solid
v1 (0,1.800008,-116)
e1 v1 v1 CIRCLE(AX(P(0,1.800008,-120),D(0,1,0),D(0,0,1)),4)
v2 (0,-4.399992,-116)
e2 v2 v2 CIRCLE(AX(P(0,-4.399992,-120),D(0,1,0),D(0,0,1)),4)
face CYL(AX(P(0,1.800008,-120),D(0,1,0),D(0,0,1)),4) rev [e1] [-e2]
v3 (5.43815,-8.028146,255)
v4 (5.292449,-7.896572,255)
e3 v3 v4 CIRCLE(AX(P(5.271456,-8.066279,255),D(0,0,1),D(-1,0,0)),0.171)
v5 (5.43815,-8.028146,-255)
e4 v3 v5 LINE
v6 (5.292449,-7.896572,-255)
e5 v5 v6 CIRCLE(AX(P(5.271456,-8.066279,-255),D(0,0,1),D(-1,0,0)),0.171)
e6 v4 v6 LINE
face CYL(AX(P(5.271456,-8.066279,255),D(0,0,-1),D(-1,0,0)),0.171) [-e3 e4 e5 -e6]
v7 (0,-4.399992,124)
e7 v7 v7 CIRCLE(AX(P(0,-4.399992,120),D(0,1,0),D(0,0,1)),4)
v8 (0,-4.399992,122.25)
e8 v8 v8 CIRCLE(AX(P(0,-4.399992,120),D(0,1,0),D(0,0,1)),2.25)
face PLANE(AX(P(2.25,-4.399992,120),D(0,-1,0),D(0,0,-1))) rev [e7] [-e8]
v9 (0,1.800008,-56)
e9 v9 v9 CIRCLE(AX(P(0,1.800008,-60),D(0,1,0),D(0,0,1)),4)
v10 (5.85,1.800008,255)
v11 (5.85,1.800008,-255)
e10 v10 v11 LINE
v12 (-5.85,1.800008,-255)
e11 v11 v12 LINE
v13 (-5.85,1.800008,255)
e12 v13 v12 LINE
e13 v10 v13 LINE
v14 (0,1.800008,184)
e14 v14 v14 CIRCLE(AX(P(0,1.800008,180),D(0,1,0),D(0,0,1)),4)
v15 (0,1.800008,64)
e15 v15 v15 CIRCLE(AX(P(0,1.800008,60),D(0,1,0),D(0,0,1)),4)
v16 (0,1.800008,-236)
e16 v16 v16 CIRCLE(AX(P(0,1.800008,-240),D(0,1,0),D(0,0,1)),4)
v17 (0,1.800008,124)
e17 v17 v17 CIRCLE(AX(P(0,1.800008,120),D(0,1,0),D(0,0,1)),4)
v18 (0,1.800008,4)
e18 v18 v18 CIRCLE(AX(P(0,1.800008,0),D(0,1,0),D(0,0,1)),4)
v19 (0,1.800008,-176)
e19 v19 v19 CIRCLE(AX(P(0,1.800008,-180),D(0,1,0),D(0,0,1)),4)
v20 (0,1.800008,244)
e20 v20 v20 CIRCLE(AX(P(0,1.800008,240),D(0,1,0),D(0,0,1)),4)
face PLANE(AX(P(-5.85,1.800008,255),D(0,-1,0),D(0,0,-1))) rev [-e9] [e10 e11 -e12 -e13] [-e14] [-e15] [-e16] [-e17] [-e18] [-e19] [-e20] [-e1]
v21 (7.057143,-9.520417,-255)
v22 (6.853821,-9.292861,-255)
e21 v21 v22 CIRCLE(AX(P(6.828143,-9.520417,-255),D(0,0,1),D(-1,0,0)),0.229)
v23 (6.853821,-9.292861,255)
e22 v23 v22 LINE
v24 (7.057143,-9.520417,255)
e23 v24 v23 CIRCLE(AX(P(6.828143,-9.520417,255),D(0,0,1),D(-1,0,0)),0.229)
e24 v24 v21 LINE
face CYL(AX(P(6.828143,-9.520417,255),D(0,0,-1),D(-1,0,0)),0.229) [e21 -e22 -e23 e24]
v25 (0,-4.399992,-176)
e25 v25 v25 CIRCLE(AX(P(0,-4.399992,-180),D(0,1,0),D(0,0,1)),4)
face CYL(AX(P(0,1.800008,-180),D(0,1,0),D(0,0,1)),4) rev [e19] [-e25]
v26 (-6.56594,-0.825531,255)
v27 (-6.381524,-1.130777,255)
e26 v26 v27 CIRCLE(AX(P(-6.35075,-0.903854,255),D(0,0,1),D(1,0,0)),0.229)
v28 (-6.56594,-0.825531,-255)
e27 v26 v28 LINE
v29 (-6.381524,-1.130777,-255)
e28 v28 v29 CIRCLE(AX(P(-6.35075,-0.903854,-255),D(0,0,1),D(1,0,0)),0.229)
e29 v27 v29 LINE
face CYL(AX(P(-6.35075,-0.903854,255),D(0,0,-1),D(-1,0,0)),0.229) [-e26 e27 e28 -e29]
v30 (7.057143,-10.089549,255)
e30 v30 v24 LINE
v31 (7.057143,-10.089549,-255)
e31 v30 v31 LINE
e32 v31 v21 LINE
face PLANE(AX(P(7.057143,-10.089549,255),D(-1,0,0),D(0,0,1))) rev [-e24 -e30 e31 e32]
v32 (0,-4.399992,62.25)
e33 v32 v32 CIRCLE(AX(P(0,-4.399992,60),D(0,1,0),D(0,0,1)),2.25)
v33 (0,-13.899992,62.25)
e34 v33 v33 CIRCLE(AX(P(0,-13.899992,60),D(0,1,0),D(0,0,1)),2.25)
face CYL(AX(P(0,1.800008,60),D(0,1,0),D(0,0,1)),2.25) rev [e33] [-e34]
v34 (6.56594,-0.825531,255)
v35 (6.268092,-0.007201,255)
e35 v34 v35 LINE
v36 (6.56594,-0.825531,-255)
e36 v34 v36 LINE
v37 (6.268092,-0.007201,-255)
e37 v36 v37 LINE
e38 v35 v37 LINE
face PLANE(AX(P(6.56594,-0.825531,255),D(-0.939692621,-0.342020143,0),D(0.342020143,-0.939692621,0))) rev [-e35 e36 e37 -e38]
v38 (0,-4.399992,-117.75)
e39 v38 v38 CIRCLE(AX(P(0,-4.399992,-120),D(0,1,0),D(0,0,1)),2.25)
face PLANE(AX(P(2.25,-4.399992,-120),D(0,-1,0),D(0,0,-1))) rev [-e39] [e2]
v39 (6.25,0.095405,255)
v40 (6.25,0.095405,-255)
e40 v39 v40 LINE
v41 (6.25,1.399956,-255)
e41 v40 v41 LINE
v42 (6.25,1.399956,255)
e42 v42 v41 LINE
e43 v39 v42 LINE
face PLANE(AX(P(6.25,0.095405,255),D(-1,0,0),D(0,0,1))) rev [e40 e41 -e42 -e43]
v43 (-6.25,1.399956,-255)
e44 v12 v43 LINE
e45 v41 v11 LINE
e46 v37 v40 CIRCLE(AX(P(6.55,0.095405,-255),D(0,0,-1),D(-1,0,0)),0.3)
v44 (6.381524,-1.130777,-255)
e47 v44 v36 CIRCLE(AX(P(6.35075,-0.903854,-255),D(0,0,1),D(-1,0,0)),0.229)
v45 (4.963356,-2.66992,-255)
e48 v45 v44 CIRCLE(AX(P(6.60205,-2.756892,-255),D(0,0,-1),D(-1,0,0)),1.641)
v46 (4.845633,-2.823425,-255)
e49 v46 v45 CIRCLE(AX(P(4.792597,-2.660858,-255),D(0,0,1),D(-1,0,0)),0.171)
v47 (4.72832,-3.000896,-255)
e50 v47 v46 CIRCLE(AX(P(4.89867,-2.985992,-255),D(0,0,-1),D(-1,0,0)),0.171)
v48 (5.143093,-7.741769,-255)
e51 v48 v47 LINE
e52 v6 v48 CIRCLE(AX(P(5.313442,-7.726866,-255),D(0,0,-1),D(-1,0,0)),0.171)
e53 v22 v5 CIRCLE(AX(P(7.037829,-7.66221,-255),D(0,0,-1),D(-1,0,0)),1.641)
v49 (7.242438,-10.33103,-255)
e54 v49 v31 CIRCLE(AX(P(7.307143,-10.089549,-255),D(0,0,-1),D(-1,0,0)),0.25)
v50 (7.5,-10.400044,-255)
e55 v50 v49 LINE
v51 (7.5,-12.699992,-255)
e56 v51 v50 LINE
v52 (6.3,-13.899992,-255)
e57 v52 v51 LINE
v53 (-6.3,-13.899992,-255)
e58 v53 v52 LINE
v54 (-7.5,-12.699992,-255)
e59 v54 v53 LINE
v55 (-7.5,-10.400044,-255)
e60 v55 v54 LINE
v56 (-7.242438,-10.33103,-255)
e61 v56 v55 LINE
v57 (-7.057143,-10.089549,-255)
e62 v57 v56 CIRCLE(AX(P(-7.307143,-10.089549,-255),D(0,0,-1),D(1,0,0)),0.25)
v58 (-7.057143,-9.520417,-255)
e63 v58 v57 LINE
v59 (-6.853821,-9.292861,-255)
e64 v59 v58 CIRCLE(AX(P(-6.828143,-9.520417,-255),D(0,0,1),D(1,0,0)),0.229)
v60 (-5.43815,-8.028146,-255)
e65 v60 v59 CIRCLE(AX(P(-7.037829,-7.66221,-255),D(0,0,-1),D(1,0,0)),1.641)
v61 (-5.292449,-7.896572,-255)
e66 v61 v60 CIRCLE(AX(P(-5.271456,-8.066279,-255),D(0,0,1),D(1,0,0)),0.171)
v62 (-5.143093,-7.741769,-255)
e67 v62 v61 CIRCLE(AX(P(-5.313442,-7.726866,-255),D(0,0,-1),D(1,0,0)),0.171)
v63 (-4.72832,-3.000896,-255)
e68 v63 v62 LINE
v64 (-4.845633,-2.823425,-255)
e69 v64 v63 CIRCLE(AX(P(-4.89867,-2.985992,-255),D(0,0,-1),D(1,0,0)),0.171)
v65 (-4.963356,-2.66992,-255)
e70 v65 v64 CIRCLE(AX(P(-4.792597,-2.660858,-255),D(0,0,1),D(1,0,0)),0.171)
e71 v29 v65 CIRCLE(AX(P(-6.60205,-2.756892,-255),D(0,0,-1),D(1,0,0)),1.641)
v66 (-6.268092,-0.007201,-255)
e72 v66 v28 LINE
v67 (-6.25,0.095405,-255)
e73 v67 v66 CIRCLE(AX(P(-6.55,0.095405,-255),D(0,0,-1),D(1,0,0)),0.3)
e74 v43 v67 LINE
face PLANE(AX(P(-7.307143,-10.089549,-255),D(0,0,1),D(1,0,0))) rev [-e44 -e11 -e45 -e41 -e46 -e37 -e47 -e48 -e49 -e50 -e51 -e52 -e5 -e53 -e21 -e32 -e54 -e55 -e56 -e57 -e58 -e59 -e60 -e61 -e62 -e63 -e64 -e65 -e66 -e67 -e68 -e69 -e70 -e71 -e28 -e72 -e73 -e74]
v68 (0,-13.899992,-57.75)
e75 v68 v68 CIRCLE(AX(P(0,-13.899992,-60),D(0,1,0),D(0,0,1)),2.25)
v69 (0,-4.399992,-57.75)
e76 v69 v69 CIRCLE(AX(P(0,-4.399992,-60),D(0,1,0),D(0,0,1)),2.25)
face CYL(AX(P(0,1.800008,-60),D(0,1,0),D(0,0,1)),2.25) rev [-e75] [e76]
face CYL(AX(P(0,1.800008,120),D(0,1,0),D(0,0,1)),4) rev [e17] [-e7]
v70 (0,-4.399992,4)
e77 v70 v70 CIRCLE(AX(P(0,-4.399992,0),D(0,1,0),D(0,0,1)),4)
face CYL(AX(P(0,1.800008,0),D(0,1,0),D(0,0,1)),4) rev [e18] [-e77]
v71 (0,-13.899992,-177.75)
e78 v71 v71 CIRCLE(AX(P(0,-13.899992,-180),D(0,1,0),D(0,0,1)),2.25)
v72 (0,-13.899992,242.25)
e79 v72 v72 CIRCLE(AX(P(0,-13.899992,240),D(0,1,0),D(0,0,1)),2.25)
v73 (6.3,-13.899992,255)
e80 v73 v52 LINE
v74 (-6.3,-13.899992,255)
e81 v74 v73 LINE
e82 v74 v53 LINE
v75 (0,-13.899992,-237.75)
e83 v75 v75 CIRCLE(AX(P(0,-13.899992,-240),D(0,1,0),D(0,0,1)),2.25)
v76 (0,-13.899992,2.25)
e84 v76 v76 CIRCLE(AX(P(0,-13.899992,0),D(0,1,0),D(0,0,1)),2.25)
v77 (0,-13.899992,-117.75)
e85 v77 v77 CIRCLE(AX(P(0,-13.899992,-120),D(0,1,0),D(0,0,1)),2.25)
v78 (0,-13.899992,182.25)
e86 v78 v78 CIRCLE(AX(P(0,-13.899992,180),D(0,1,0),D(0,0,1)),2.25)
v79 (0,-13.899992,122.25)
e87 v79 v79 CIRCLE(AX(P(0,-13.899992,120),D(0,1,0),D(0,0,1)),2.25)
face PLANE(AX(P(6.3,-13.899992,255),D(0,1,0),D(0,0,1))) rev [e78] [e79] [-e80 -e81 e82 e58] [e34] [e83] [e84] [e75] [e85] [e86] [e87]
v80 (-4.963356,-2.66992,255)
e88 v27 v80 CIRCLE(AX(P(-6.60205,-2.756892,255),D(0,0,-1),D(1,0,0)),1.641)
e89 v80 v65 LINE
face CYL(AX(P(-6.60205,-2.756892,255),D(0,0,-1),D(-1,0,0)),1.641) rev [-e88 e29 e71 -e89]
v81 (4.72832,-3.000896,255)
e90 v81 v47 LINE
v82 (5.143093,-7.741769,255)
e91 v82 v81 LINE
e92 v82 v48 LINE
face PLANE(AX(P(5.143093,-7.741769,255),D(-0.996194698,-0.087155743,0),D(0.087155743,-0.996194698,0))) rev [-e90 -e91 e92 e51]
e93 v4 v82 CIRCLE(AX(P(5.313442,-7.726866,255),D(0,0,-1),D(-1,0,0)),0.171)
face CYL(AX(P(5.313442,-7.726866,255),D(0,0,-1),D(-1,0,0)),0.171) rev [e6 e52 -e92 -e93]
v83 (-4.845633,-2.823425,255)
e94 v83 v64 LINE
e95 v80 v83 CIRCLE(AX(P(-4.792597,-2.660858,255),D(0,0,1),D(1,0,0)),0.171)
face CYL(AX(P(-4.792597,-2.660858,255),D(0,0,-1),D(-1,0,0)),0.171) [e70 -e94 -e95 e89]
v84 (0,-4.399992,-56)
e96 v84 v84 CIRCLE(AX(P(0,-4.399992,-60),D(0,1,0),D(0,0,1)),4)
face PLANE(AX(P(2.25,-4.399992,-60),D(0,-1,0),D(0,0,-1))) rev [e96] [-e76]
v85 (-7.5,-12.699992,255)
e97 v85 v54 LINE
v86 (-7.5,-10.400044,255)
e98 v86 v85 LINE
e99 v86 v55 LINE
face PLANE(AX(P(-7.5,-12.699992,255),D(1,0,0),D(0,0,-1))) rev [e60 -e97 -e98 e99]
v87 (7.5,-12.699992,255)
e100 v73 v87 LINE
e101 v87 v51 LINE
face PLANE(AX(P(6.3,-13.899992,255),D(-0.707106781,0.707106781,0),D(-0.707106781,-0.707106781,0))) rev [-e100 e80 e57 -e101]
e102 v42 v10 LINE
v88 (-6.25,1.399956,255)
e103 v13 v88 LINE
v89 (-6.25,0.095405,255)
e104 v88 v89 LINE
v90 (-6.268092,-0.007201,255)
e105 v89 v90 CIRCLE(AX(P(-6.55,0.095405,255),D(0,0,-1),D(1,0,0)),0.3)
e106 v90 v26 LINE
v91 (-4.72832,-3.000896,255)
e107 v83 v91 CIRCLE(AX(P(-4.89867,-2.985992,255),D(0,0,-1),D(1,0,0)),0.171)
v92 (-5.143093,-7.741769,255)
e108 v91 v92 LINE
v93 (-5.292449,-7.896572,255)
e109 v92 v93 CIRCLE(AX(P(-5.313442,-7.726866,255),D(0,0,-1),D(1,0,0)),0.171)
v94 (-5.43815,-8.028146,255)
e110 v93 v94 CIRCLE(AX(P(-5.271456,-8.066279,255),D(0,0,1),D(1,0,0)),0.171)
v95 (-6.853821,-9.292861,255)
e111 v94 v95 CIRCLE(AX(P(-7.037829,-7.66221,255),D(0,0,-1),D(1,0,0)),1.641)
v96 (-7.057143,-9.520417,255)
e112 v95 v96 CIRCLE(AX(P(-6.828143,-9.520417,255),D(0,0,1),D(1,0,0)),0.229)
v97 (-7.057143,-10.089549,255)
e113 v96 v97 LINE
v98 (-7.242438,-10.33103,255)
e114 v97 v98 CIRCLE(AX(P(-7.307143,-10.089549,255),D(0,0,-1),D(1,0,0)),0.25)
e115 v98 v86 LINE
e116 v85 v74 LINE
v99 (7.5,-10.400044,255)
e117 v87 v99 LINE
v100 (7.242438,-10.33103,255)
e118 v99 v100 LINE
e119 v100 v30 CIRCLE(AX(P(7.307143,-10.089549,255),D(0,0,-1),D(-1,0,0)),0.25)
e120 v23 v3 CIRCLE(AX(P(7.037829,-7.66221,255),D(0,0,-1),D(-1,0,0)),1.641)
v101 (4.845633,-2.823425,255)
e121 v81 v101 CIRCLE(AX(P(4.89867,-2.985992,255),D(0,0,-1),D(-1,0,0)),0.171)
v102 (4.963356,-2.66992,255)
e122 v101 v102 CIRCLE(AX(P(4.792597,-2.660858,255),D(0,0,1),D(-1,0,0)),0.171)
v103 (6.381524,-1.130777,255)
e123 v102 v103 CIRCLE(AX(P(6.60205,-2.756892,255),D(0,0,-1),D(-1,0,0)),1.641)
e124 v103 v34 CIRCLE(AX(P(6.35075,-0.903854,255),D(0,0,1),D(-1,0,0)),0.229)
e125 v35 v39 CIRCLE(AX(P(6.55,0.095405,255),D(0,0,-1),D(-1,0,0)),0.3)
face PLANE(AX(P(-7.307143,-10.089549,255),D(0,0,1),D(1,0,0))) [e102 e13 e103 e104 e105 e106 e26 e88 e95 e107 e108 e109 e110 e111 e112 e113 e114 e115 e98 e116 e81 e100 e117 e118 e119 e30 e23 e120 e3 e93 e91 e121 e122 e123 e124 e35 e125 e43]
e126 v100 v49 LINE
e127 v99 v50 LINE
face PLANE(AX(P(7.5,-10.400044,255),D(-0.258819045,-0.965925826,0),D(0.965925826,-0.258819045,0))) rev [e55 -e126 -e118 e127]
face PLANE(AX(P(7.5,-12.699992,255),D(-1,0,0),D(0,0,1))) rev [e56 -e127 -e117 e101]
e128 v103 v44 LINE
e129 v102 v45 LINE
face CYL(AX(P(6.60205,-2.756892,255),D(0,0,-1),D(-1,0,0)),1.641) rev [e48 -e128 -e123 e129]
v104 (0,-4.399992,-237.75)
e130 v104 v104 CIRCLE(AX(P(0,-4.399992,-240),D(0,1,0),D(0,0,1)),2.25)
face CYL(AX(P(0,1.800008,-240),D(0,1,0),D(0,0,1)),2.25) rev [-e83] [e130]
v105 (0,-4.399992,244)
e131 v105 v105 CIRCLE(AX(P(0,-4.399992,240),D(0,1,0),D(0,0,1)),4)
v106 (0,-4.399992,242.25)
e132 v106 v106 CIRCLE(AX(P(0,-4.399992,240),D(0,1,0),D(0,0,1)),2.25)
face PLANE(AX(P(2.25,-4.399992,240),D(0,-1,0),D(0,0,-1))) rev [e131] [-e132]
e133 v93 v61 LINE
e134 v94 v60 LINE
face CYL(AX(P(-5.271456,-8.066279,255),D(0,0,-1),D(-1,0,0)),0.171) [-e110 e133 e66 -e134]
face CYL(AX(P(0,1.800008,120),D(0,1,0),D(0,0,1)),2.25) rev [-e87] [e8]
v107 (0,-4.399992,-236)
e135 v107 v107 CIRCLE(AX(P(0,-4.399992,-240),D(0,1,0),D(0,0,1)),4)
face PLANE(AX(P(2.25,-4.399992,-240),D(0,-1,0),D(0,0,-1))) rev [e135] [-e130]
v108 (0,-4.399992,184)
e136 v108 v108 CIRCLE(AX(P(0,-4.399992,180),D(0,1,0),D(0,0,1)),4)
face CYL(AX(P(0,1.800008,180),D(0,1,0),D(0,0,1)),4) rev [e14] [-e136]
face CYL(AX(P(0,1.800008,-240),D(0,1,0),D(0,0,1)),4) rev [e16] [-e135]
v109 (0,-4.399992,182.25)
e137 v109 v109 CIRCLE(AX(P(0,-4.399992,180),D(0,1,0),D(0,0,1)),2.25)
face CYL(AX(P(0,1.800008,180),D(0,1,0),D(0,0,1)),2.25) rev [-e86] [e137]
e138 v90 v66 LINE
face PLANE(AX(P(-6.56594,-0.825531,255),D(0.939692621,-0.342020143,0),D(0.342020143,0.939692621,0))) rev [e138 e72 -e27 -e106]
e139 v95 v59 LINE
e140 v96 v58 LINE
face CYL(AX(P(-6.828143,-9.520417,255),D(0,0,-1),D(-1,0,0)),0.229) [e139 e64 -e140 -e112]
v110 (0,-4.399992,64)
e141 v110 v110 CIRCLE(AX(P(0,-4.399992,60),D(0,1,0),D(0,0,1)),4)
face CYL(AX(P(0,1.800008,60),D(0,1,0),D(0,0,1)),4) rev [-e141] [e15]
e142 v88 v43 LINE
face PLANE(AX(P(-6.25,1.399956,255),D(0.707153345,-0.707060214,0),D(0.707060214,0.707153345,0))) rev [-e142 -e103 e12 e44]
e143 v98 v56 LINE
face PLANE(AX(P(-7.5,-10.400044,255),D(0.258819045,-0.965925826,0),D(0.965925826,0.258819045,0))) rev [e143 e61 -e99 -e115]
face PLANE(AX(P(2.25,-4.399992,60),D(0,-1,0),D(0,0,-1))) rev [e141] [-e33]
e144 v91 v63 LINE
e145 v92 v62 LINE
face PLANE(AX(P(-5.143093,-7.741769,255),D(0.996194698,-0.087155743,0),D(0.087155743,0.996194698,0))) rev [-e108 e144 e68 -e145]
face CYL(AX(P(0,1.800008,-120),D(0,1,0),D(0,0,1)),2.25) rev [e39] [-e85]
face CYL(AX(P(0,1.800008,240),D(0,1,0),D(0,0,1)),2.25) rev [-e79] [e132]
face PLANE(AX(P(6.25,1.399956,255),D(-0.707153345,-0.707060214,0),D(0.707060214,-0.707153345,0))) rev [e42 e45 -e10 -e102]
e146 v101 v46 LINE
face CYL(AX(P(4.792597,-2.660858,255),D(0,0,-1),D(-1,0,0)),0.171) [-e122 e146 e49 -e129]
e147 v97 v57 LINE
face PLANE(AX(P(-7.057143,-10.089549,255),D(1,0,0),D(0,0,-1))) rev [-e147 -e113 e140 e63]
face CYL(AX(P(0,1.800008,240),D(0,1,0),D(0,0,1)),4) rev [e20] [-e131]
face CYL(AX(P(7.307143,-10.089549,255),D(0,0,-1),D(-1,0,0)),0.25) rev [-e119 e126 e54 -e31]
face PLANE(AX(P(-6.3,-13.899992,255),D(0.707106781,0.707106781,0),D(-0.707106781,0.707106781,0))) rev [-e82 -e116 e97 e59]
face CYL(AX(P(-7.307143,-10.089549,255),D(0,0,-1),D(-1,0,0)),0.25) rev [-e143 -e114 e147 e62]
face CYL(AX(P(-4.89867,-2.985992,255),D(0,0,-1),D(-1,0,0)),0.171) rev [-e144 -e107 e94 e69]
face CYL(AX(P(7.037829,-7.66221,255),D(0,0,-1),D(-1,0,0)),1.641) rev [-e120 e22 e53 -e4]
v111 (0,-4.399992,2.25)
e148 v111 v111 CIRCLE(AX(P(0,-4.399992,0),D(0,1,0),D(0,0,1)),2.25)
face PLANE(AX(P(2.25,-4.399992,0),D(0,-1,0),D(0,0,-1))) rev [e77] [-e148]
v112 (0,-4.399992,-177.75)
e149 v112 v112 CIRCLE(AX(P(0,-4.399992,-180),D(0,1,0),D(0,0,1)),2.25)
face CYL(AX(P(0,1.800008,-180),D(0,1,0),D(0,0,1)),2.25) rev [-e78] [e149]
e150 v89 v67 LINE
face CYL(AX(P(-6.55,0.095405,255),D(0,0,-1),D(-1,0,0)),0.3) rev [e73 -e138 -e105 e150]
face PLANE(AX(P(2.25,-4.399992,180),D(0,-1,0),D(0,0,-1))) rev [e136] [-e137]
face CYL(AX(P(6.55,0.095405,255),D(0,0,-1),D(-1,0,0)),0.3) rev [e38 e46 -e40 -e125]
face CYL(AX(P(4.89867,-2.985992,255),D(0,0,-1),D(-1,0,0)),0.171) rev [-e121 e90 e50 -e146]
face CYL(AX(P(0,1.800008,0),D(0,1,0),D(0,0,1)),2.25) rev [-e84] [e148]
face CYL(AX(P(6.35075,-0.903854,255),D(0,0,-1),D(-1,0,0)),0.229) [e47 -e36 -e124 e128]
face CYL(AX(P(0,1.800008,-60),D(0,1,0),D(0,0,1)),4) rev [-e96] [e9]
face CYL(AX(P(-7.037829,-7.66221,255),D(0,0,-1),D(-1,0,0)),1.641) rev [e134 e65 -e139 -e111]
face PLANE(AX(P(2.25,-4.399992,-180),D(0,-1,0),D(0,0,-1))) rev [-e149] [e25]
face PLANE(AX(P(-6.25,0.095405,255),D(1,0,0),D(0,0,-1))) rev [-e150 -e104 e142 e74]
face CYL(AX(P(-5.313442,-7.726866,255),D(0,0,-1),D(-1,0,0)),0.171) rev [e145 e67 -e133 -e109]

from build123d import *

# Parameters (mm, degrees)
EXTRUDE1_DEPTH        = 255
LPATTERN1_START       = -4.39999151
LPATTERN1_OUTLINE_R   = 4
LPATTERN1_DEPTH       = 6.200000002
LPATTERN1_START_2     = -13.89999151
LPATTERN1_2_OUTLINE_R = 2.25
LPATTERN1_2_DEPTH     = 9.5


# Read off the part's stored shape, not the designer's step: LPattern1
with BuildPart() as part:
    # Sketch1 → Extrude1 (new, symmetric)
    with BuildSketch(Plane.XY):
        with BuildLine():
            Line((6.299999998, -13.89999151), (7.499999673, -12.699991836))
            Line((7.499999673, -12.699991836), (7.499999673, -10.400043863))
            Line((7.499999673, -10.400043863), (7.242437811, -10.331030371))
            ThreePointArc((7.242437811, -10.331030371), (7.108804238, -10.241739271), (7.057142573, -10.089548914))
            Line((7.057142573, -10.089548914), (7.057142573, -9.520416543))
            ThreePointArc((7.057142573, -9.520416543), (6.998907475, -9.367837553), (6.853820755, -9.292860767))
            ThreePointArc((6.853820755, -9.292860767), (5.94454945, -8.885983146), (5.43815048, -8.028146455))
            ThreePointArc((5.43815048, -8.028146455), (5.386062423, -7.939367574), (5.292449295, -7.896572271))
            ThreePointArc((5.292449295, -7.896572271), (5.190381489, -7.845596795), (5.143092926, -7.7417694))
            Line((5.143092926, -7.7417694), (4.728320242, -3.00089593))
            ThreePointArc((4.728320242, -3.00089593), (4.727832289, -2.993451213), (4.727669535, -2.985992298))
            ThreePointArc((4.727669535, -2.985992298), (4.760267524, -2.885563799), (4.845633084, -2.823424974))
            ThreePointArc((4.845633084, -2.823424974), (4.928287775, -2.764919717), (4.963356305, -2.669920448))
            ThreePointArc((4.963356305, -2.669920448), (5.395229732, -1.644926655), (6.381524191, -1.130776701))
            ThreePointArc((6.381524191, -1.130776701), (6.54675572, -1.022271679), (6.565939633, -0.825531303))
            Line((6.565939633, -0.825531303), (6.268091886, -0.007201345))
            ThreePointArc((6.268091886, -0.007201345), (6.254557346, 0.043310245), (6.249999672, 0.095404698))
            Line((6.249999672, 0.095404698), (6.249999672, 1.399956135))
            Line((6.249999672, 1.399956135), (5.850000001, 1.800008492))
            Line((5.850000001, 1.800008492), (-5.849999998, 1.800008492))
            Line((-5.849999998, 1.800008492), (-6.24999967, 1.399956135))
            Line((-6.24999967, 1.399956135), (-6.24999967, 0.095404698))
            ThreePointArc((-6.24999967, 0.095404698), (-6.254557344, 0.043310245), (-6.268091883, -0.007201345))
            Line((-6.268091883, -0.007201345), (-6.56593963, -0.825531303))
            ThreePointArc((-6.56593963, -0.825531303), (-6.546755717, -1.022271679), (-6.381524188, -1.130776701))
            ThreePointArc((-6.381524188, -1.130776701), (-5.39522973, -1.644926655), (-4.963356302, -2.669920448))
            ThreePointArc((-4.963356302, -2.669920448), (-4.928287772, -2.764919717), (-4.845633081, -2.823424974))
            ThreePointArc((-4.845633081, -2.823424974), (-4.760267522, -2.885563799), (-4.727669532, -2.985992298))
            ThreePointArc((-4.727669532, -2.985992298), (-4.727832287, -2.993451213), (-4.728320239, -3.00089593))
            Line((-4.728320239, -3.00089593), (-5.143092923, -7.7417694))
            ThreePointArc((-5.143092923, -7.7417694), (-5.190381487, -7.845596795), (-5.292449292, -7.896572271))
            ThreePointArc((-5.292449292, -7.896572271), (-5.38606242, -7.939367574), (-5.438150478, -8.028146455))
            ThreePointArc((-5.438150478, -8.028146455), (-5.944549448, -8.885983146), (-6.853820752, -9.292860767))
            ThreePointArc((-6.853820752, -9.292860767), (-6.998907472, -9.367837553), (-7.05714257, -9.520416543))
            Line((-7.05714257, -9.520416543), (-7.05714257, -10.089548914))
            ThreePointArc((-7.05714257, -10.089548914), (-7.108804235, -10.241739271), (-7.242437809, -10.331030371))
            Line((-7.242437809, -10.331030371), (-7.49999967, -10.400043863))
            Line((-7.49999967, -10.400043863), (-7.49999967, -12.699991836))
            Line((-7.49999967, -12.699991836), (-6.299999996, -13.89999151))
            Line((-6.299999996, -13.89999151), (6.299999998, -13.89999151))
        make_face()
    extrude(amount=EXTRUDE1_DEPTH, both=True)

    # Sketch2 → Hole1 (revolve, cut)
    with BuildSketch(Plane(origin=(0, 1.800008492, 240), x_dir=(0, 0, 1), z_dir=(1, 0, 0))):
        Polygon((0, 0), (0, 17.051936395), (2.25, 15.700000002), (2.25, 6.200000002), (4, 6.200000002), (4, 0), align=None)
    hole1 = revolve(axis=Axis((0, 13.110883531, 240), (0, -1, 0)), mode=Mode.SUBTRACT)

    # LPattern1 outline → LPattern1 (cut)
    with BuildSketch(Plane(origin=(0, 0, 0), x_dir=(1, 0, 0), z_dir=(0, 1, 0)).offset(LPATTERN1_START)):
        with Locations((0, -180)):
            Circle(LPATTERN1_OUTLINE_R)
        with Locations((0, -120)):
            Circle(LPATTERN1_OUTLINE_R)
        with Locations((0, -60)):
            Circle(LPATTERN1_OUTLINE_R)
        Circle(LPATTERN1_OUTLINE_R)
        with Locations((0, 60)):
            Circle(LPATTERN1_OUTLINE_R)
        with Locations((0, 120)):
            Circle(LPATTERN1_OUTLINE_R)
        with Locations((0, 180)):
            Circle(LPATTERN1_OUTLINE_R)
    extrude(amount=LPATTERN1_DEPTH, mode=Mode.SUBTRACT)

    # LPattern1 2 outline → LPattern1 2 (cut)
    with BuildSketch(Plane(origin=(0, 0, 0), x_dir=(1, 0, 0), z_dir=(0, 1, 0)).offset(LPATTERN1_START_2)):
        with Locations((0, -180)):
            Circle(LPATTERN1_2_OUTLINE_R)
        with Locations((0, -120)):
            Circle(LPATTERN1_2_OUTLINE_R)
        with Locations((0, -60)):
            Circle(LPATTERN1_2_OUTLINE_R)
        Circle(LPATTERN1_2_OUTLINE_R)
        with Locations((0, 60)):
            Circle(LPATTERN1_2_OUTLINE_R)
        with Locations((0, 120)):
            Circle(LPATTERN1_2_OUTLINE_R)
        with Locations((0, 180)):
            Circle(LPATTERN1_2_OUTLINE_R)
    extrude(amount=LPATTERN1_2_DEPTH, mode=Mode.SUBTRACT)

    # A-Mirror1: Hole1 across plane
    add(hole1.mirror(Plane.XY), mode=Mode.SUBTRACT)


solid = part.part
